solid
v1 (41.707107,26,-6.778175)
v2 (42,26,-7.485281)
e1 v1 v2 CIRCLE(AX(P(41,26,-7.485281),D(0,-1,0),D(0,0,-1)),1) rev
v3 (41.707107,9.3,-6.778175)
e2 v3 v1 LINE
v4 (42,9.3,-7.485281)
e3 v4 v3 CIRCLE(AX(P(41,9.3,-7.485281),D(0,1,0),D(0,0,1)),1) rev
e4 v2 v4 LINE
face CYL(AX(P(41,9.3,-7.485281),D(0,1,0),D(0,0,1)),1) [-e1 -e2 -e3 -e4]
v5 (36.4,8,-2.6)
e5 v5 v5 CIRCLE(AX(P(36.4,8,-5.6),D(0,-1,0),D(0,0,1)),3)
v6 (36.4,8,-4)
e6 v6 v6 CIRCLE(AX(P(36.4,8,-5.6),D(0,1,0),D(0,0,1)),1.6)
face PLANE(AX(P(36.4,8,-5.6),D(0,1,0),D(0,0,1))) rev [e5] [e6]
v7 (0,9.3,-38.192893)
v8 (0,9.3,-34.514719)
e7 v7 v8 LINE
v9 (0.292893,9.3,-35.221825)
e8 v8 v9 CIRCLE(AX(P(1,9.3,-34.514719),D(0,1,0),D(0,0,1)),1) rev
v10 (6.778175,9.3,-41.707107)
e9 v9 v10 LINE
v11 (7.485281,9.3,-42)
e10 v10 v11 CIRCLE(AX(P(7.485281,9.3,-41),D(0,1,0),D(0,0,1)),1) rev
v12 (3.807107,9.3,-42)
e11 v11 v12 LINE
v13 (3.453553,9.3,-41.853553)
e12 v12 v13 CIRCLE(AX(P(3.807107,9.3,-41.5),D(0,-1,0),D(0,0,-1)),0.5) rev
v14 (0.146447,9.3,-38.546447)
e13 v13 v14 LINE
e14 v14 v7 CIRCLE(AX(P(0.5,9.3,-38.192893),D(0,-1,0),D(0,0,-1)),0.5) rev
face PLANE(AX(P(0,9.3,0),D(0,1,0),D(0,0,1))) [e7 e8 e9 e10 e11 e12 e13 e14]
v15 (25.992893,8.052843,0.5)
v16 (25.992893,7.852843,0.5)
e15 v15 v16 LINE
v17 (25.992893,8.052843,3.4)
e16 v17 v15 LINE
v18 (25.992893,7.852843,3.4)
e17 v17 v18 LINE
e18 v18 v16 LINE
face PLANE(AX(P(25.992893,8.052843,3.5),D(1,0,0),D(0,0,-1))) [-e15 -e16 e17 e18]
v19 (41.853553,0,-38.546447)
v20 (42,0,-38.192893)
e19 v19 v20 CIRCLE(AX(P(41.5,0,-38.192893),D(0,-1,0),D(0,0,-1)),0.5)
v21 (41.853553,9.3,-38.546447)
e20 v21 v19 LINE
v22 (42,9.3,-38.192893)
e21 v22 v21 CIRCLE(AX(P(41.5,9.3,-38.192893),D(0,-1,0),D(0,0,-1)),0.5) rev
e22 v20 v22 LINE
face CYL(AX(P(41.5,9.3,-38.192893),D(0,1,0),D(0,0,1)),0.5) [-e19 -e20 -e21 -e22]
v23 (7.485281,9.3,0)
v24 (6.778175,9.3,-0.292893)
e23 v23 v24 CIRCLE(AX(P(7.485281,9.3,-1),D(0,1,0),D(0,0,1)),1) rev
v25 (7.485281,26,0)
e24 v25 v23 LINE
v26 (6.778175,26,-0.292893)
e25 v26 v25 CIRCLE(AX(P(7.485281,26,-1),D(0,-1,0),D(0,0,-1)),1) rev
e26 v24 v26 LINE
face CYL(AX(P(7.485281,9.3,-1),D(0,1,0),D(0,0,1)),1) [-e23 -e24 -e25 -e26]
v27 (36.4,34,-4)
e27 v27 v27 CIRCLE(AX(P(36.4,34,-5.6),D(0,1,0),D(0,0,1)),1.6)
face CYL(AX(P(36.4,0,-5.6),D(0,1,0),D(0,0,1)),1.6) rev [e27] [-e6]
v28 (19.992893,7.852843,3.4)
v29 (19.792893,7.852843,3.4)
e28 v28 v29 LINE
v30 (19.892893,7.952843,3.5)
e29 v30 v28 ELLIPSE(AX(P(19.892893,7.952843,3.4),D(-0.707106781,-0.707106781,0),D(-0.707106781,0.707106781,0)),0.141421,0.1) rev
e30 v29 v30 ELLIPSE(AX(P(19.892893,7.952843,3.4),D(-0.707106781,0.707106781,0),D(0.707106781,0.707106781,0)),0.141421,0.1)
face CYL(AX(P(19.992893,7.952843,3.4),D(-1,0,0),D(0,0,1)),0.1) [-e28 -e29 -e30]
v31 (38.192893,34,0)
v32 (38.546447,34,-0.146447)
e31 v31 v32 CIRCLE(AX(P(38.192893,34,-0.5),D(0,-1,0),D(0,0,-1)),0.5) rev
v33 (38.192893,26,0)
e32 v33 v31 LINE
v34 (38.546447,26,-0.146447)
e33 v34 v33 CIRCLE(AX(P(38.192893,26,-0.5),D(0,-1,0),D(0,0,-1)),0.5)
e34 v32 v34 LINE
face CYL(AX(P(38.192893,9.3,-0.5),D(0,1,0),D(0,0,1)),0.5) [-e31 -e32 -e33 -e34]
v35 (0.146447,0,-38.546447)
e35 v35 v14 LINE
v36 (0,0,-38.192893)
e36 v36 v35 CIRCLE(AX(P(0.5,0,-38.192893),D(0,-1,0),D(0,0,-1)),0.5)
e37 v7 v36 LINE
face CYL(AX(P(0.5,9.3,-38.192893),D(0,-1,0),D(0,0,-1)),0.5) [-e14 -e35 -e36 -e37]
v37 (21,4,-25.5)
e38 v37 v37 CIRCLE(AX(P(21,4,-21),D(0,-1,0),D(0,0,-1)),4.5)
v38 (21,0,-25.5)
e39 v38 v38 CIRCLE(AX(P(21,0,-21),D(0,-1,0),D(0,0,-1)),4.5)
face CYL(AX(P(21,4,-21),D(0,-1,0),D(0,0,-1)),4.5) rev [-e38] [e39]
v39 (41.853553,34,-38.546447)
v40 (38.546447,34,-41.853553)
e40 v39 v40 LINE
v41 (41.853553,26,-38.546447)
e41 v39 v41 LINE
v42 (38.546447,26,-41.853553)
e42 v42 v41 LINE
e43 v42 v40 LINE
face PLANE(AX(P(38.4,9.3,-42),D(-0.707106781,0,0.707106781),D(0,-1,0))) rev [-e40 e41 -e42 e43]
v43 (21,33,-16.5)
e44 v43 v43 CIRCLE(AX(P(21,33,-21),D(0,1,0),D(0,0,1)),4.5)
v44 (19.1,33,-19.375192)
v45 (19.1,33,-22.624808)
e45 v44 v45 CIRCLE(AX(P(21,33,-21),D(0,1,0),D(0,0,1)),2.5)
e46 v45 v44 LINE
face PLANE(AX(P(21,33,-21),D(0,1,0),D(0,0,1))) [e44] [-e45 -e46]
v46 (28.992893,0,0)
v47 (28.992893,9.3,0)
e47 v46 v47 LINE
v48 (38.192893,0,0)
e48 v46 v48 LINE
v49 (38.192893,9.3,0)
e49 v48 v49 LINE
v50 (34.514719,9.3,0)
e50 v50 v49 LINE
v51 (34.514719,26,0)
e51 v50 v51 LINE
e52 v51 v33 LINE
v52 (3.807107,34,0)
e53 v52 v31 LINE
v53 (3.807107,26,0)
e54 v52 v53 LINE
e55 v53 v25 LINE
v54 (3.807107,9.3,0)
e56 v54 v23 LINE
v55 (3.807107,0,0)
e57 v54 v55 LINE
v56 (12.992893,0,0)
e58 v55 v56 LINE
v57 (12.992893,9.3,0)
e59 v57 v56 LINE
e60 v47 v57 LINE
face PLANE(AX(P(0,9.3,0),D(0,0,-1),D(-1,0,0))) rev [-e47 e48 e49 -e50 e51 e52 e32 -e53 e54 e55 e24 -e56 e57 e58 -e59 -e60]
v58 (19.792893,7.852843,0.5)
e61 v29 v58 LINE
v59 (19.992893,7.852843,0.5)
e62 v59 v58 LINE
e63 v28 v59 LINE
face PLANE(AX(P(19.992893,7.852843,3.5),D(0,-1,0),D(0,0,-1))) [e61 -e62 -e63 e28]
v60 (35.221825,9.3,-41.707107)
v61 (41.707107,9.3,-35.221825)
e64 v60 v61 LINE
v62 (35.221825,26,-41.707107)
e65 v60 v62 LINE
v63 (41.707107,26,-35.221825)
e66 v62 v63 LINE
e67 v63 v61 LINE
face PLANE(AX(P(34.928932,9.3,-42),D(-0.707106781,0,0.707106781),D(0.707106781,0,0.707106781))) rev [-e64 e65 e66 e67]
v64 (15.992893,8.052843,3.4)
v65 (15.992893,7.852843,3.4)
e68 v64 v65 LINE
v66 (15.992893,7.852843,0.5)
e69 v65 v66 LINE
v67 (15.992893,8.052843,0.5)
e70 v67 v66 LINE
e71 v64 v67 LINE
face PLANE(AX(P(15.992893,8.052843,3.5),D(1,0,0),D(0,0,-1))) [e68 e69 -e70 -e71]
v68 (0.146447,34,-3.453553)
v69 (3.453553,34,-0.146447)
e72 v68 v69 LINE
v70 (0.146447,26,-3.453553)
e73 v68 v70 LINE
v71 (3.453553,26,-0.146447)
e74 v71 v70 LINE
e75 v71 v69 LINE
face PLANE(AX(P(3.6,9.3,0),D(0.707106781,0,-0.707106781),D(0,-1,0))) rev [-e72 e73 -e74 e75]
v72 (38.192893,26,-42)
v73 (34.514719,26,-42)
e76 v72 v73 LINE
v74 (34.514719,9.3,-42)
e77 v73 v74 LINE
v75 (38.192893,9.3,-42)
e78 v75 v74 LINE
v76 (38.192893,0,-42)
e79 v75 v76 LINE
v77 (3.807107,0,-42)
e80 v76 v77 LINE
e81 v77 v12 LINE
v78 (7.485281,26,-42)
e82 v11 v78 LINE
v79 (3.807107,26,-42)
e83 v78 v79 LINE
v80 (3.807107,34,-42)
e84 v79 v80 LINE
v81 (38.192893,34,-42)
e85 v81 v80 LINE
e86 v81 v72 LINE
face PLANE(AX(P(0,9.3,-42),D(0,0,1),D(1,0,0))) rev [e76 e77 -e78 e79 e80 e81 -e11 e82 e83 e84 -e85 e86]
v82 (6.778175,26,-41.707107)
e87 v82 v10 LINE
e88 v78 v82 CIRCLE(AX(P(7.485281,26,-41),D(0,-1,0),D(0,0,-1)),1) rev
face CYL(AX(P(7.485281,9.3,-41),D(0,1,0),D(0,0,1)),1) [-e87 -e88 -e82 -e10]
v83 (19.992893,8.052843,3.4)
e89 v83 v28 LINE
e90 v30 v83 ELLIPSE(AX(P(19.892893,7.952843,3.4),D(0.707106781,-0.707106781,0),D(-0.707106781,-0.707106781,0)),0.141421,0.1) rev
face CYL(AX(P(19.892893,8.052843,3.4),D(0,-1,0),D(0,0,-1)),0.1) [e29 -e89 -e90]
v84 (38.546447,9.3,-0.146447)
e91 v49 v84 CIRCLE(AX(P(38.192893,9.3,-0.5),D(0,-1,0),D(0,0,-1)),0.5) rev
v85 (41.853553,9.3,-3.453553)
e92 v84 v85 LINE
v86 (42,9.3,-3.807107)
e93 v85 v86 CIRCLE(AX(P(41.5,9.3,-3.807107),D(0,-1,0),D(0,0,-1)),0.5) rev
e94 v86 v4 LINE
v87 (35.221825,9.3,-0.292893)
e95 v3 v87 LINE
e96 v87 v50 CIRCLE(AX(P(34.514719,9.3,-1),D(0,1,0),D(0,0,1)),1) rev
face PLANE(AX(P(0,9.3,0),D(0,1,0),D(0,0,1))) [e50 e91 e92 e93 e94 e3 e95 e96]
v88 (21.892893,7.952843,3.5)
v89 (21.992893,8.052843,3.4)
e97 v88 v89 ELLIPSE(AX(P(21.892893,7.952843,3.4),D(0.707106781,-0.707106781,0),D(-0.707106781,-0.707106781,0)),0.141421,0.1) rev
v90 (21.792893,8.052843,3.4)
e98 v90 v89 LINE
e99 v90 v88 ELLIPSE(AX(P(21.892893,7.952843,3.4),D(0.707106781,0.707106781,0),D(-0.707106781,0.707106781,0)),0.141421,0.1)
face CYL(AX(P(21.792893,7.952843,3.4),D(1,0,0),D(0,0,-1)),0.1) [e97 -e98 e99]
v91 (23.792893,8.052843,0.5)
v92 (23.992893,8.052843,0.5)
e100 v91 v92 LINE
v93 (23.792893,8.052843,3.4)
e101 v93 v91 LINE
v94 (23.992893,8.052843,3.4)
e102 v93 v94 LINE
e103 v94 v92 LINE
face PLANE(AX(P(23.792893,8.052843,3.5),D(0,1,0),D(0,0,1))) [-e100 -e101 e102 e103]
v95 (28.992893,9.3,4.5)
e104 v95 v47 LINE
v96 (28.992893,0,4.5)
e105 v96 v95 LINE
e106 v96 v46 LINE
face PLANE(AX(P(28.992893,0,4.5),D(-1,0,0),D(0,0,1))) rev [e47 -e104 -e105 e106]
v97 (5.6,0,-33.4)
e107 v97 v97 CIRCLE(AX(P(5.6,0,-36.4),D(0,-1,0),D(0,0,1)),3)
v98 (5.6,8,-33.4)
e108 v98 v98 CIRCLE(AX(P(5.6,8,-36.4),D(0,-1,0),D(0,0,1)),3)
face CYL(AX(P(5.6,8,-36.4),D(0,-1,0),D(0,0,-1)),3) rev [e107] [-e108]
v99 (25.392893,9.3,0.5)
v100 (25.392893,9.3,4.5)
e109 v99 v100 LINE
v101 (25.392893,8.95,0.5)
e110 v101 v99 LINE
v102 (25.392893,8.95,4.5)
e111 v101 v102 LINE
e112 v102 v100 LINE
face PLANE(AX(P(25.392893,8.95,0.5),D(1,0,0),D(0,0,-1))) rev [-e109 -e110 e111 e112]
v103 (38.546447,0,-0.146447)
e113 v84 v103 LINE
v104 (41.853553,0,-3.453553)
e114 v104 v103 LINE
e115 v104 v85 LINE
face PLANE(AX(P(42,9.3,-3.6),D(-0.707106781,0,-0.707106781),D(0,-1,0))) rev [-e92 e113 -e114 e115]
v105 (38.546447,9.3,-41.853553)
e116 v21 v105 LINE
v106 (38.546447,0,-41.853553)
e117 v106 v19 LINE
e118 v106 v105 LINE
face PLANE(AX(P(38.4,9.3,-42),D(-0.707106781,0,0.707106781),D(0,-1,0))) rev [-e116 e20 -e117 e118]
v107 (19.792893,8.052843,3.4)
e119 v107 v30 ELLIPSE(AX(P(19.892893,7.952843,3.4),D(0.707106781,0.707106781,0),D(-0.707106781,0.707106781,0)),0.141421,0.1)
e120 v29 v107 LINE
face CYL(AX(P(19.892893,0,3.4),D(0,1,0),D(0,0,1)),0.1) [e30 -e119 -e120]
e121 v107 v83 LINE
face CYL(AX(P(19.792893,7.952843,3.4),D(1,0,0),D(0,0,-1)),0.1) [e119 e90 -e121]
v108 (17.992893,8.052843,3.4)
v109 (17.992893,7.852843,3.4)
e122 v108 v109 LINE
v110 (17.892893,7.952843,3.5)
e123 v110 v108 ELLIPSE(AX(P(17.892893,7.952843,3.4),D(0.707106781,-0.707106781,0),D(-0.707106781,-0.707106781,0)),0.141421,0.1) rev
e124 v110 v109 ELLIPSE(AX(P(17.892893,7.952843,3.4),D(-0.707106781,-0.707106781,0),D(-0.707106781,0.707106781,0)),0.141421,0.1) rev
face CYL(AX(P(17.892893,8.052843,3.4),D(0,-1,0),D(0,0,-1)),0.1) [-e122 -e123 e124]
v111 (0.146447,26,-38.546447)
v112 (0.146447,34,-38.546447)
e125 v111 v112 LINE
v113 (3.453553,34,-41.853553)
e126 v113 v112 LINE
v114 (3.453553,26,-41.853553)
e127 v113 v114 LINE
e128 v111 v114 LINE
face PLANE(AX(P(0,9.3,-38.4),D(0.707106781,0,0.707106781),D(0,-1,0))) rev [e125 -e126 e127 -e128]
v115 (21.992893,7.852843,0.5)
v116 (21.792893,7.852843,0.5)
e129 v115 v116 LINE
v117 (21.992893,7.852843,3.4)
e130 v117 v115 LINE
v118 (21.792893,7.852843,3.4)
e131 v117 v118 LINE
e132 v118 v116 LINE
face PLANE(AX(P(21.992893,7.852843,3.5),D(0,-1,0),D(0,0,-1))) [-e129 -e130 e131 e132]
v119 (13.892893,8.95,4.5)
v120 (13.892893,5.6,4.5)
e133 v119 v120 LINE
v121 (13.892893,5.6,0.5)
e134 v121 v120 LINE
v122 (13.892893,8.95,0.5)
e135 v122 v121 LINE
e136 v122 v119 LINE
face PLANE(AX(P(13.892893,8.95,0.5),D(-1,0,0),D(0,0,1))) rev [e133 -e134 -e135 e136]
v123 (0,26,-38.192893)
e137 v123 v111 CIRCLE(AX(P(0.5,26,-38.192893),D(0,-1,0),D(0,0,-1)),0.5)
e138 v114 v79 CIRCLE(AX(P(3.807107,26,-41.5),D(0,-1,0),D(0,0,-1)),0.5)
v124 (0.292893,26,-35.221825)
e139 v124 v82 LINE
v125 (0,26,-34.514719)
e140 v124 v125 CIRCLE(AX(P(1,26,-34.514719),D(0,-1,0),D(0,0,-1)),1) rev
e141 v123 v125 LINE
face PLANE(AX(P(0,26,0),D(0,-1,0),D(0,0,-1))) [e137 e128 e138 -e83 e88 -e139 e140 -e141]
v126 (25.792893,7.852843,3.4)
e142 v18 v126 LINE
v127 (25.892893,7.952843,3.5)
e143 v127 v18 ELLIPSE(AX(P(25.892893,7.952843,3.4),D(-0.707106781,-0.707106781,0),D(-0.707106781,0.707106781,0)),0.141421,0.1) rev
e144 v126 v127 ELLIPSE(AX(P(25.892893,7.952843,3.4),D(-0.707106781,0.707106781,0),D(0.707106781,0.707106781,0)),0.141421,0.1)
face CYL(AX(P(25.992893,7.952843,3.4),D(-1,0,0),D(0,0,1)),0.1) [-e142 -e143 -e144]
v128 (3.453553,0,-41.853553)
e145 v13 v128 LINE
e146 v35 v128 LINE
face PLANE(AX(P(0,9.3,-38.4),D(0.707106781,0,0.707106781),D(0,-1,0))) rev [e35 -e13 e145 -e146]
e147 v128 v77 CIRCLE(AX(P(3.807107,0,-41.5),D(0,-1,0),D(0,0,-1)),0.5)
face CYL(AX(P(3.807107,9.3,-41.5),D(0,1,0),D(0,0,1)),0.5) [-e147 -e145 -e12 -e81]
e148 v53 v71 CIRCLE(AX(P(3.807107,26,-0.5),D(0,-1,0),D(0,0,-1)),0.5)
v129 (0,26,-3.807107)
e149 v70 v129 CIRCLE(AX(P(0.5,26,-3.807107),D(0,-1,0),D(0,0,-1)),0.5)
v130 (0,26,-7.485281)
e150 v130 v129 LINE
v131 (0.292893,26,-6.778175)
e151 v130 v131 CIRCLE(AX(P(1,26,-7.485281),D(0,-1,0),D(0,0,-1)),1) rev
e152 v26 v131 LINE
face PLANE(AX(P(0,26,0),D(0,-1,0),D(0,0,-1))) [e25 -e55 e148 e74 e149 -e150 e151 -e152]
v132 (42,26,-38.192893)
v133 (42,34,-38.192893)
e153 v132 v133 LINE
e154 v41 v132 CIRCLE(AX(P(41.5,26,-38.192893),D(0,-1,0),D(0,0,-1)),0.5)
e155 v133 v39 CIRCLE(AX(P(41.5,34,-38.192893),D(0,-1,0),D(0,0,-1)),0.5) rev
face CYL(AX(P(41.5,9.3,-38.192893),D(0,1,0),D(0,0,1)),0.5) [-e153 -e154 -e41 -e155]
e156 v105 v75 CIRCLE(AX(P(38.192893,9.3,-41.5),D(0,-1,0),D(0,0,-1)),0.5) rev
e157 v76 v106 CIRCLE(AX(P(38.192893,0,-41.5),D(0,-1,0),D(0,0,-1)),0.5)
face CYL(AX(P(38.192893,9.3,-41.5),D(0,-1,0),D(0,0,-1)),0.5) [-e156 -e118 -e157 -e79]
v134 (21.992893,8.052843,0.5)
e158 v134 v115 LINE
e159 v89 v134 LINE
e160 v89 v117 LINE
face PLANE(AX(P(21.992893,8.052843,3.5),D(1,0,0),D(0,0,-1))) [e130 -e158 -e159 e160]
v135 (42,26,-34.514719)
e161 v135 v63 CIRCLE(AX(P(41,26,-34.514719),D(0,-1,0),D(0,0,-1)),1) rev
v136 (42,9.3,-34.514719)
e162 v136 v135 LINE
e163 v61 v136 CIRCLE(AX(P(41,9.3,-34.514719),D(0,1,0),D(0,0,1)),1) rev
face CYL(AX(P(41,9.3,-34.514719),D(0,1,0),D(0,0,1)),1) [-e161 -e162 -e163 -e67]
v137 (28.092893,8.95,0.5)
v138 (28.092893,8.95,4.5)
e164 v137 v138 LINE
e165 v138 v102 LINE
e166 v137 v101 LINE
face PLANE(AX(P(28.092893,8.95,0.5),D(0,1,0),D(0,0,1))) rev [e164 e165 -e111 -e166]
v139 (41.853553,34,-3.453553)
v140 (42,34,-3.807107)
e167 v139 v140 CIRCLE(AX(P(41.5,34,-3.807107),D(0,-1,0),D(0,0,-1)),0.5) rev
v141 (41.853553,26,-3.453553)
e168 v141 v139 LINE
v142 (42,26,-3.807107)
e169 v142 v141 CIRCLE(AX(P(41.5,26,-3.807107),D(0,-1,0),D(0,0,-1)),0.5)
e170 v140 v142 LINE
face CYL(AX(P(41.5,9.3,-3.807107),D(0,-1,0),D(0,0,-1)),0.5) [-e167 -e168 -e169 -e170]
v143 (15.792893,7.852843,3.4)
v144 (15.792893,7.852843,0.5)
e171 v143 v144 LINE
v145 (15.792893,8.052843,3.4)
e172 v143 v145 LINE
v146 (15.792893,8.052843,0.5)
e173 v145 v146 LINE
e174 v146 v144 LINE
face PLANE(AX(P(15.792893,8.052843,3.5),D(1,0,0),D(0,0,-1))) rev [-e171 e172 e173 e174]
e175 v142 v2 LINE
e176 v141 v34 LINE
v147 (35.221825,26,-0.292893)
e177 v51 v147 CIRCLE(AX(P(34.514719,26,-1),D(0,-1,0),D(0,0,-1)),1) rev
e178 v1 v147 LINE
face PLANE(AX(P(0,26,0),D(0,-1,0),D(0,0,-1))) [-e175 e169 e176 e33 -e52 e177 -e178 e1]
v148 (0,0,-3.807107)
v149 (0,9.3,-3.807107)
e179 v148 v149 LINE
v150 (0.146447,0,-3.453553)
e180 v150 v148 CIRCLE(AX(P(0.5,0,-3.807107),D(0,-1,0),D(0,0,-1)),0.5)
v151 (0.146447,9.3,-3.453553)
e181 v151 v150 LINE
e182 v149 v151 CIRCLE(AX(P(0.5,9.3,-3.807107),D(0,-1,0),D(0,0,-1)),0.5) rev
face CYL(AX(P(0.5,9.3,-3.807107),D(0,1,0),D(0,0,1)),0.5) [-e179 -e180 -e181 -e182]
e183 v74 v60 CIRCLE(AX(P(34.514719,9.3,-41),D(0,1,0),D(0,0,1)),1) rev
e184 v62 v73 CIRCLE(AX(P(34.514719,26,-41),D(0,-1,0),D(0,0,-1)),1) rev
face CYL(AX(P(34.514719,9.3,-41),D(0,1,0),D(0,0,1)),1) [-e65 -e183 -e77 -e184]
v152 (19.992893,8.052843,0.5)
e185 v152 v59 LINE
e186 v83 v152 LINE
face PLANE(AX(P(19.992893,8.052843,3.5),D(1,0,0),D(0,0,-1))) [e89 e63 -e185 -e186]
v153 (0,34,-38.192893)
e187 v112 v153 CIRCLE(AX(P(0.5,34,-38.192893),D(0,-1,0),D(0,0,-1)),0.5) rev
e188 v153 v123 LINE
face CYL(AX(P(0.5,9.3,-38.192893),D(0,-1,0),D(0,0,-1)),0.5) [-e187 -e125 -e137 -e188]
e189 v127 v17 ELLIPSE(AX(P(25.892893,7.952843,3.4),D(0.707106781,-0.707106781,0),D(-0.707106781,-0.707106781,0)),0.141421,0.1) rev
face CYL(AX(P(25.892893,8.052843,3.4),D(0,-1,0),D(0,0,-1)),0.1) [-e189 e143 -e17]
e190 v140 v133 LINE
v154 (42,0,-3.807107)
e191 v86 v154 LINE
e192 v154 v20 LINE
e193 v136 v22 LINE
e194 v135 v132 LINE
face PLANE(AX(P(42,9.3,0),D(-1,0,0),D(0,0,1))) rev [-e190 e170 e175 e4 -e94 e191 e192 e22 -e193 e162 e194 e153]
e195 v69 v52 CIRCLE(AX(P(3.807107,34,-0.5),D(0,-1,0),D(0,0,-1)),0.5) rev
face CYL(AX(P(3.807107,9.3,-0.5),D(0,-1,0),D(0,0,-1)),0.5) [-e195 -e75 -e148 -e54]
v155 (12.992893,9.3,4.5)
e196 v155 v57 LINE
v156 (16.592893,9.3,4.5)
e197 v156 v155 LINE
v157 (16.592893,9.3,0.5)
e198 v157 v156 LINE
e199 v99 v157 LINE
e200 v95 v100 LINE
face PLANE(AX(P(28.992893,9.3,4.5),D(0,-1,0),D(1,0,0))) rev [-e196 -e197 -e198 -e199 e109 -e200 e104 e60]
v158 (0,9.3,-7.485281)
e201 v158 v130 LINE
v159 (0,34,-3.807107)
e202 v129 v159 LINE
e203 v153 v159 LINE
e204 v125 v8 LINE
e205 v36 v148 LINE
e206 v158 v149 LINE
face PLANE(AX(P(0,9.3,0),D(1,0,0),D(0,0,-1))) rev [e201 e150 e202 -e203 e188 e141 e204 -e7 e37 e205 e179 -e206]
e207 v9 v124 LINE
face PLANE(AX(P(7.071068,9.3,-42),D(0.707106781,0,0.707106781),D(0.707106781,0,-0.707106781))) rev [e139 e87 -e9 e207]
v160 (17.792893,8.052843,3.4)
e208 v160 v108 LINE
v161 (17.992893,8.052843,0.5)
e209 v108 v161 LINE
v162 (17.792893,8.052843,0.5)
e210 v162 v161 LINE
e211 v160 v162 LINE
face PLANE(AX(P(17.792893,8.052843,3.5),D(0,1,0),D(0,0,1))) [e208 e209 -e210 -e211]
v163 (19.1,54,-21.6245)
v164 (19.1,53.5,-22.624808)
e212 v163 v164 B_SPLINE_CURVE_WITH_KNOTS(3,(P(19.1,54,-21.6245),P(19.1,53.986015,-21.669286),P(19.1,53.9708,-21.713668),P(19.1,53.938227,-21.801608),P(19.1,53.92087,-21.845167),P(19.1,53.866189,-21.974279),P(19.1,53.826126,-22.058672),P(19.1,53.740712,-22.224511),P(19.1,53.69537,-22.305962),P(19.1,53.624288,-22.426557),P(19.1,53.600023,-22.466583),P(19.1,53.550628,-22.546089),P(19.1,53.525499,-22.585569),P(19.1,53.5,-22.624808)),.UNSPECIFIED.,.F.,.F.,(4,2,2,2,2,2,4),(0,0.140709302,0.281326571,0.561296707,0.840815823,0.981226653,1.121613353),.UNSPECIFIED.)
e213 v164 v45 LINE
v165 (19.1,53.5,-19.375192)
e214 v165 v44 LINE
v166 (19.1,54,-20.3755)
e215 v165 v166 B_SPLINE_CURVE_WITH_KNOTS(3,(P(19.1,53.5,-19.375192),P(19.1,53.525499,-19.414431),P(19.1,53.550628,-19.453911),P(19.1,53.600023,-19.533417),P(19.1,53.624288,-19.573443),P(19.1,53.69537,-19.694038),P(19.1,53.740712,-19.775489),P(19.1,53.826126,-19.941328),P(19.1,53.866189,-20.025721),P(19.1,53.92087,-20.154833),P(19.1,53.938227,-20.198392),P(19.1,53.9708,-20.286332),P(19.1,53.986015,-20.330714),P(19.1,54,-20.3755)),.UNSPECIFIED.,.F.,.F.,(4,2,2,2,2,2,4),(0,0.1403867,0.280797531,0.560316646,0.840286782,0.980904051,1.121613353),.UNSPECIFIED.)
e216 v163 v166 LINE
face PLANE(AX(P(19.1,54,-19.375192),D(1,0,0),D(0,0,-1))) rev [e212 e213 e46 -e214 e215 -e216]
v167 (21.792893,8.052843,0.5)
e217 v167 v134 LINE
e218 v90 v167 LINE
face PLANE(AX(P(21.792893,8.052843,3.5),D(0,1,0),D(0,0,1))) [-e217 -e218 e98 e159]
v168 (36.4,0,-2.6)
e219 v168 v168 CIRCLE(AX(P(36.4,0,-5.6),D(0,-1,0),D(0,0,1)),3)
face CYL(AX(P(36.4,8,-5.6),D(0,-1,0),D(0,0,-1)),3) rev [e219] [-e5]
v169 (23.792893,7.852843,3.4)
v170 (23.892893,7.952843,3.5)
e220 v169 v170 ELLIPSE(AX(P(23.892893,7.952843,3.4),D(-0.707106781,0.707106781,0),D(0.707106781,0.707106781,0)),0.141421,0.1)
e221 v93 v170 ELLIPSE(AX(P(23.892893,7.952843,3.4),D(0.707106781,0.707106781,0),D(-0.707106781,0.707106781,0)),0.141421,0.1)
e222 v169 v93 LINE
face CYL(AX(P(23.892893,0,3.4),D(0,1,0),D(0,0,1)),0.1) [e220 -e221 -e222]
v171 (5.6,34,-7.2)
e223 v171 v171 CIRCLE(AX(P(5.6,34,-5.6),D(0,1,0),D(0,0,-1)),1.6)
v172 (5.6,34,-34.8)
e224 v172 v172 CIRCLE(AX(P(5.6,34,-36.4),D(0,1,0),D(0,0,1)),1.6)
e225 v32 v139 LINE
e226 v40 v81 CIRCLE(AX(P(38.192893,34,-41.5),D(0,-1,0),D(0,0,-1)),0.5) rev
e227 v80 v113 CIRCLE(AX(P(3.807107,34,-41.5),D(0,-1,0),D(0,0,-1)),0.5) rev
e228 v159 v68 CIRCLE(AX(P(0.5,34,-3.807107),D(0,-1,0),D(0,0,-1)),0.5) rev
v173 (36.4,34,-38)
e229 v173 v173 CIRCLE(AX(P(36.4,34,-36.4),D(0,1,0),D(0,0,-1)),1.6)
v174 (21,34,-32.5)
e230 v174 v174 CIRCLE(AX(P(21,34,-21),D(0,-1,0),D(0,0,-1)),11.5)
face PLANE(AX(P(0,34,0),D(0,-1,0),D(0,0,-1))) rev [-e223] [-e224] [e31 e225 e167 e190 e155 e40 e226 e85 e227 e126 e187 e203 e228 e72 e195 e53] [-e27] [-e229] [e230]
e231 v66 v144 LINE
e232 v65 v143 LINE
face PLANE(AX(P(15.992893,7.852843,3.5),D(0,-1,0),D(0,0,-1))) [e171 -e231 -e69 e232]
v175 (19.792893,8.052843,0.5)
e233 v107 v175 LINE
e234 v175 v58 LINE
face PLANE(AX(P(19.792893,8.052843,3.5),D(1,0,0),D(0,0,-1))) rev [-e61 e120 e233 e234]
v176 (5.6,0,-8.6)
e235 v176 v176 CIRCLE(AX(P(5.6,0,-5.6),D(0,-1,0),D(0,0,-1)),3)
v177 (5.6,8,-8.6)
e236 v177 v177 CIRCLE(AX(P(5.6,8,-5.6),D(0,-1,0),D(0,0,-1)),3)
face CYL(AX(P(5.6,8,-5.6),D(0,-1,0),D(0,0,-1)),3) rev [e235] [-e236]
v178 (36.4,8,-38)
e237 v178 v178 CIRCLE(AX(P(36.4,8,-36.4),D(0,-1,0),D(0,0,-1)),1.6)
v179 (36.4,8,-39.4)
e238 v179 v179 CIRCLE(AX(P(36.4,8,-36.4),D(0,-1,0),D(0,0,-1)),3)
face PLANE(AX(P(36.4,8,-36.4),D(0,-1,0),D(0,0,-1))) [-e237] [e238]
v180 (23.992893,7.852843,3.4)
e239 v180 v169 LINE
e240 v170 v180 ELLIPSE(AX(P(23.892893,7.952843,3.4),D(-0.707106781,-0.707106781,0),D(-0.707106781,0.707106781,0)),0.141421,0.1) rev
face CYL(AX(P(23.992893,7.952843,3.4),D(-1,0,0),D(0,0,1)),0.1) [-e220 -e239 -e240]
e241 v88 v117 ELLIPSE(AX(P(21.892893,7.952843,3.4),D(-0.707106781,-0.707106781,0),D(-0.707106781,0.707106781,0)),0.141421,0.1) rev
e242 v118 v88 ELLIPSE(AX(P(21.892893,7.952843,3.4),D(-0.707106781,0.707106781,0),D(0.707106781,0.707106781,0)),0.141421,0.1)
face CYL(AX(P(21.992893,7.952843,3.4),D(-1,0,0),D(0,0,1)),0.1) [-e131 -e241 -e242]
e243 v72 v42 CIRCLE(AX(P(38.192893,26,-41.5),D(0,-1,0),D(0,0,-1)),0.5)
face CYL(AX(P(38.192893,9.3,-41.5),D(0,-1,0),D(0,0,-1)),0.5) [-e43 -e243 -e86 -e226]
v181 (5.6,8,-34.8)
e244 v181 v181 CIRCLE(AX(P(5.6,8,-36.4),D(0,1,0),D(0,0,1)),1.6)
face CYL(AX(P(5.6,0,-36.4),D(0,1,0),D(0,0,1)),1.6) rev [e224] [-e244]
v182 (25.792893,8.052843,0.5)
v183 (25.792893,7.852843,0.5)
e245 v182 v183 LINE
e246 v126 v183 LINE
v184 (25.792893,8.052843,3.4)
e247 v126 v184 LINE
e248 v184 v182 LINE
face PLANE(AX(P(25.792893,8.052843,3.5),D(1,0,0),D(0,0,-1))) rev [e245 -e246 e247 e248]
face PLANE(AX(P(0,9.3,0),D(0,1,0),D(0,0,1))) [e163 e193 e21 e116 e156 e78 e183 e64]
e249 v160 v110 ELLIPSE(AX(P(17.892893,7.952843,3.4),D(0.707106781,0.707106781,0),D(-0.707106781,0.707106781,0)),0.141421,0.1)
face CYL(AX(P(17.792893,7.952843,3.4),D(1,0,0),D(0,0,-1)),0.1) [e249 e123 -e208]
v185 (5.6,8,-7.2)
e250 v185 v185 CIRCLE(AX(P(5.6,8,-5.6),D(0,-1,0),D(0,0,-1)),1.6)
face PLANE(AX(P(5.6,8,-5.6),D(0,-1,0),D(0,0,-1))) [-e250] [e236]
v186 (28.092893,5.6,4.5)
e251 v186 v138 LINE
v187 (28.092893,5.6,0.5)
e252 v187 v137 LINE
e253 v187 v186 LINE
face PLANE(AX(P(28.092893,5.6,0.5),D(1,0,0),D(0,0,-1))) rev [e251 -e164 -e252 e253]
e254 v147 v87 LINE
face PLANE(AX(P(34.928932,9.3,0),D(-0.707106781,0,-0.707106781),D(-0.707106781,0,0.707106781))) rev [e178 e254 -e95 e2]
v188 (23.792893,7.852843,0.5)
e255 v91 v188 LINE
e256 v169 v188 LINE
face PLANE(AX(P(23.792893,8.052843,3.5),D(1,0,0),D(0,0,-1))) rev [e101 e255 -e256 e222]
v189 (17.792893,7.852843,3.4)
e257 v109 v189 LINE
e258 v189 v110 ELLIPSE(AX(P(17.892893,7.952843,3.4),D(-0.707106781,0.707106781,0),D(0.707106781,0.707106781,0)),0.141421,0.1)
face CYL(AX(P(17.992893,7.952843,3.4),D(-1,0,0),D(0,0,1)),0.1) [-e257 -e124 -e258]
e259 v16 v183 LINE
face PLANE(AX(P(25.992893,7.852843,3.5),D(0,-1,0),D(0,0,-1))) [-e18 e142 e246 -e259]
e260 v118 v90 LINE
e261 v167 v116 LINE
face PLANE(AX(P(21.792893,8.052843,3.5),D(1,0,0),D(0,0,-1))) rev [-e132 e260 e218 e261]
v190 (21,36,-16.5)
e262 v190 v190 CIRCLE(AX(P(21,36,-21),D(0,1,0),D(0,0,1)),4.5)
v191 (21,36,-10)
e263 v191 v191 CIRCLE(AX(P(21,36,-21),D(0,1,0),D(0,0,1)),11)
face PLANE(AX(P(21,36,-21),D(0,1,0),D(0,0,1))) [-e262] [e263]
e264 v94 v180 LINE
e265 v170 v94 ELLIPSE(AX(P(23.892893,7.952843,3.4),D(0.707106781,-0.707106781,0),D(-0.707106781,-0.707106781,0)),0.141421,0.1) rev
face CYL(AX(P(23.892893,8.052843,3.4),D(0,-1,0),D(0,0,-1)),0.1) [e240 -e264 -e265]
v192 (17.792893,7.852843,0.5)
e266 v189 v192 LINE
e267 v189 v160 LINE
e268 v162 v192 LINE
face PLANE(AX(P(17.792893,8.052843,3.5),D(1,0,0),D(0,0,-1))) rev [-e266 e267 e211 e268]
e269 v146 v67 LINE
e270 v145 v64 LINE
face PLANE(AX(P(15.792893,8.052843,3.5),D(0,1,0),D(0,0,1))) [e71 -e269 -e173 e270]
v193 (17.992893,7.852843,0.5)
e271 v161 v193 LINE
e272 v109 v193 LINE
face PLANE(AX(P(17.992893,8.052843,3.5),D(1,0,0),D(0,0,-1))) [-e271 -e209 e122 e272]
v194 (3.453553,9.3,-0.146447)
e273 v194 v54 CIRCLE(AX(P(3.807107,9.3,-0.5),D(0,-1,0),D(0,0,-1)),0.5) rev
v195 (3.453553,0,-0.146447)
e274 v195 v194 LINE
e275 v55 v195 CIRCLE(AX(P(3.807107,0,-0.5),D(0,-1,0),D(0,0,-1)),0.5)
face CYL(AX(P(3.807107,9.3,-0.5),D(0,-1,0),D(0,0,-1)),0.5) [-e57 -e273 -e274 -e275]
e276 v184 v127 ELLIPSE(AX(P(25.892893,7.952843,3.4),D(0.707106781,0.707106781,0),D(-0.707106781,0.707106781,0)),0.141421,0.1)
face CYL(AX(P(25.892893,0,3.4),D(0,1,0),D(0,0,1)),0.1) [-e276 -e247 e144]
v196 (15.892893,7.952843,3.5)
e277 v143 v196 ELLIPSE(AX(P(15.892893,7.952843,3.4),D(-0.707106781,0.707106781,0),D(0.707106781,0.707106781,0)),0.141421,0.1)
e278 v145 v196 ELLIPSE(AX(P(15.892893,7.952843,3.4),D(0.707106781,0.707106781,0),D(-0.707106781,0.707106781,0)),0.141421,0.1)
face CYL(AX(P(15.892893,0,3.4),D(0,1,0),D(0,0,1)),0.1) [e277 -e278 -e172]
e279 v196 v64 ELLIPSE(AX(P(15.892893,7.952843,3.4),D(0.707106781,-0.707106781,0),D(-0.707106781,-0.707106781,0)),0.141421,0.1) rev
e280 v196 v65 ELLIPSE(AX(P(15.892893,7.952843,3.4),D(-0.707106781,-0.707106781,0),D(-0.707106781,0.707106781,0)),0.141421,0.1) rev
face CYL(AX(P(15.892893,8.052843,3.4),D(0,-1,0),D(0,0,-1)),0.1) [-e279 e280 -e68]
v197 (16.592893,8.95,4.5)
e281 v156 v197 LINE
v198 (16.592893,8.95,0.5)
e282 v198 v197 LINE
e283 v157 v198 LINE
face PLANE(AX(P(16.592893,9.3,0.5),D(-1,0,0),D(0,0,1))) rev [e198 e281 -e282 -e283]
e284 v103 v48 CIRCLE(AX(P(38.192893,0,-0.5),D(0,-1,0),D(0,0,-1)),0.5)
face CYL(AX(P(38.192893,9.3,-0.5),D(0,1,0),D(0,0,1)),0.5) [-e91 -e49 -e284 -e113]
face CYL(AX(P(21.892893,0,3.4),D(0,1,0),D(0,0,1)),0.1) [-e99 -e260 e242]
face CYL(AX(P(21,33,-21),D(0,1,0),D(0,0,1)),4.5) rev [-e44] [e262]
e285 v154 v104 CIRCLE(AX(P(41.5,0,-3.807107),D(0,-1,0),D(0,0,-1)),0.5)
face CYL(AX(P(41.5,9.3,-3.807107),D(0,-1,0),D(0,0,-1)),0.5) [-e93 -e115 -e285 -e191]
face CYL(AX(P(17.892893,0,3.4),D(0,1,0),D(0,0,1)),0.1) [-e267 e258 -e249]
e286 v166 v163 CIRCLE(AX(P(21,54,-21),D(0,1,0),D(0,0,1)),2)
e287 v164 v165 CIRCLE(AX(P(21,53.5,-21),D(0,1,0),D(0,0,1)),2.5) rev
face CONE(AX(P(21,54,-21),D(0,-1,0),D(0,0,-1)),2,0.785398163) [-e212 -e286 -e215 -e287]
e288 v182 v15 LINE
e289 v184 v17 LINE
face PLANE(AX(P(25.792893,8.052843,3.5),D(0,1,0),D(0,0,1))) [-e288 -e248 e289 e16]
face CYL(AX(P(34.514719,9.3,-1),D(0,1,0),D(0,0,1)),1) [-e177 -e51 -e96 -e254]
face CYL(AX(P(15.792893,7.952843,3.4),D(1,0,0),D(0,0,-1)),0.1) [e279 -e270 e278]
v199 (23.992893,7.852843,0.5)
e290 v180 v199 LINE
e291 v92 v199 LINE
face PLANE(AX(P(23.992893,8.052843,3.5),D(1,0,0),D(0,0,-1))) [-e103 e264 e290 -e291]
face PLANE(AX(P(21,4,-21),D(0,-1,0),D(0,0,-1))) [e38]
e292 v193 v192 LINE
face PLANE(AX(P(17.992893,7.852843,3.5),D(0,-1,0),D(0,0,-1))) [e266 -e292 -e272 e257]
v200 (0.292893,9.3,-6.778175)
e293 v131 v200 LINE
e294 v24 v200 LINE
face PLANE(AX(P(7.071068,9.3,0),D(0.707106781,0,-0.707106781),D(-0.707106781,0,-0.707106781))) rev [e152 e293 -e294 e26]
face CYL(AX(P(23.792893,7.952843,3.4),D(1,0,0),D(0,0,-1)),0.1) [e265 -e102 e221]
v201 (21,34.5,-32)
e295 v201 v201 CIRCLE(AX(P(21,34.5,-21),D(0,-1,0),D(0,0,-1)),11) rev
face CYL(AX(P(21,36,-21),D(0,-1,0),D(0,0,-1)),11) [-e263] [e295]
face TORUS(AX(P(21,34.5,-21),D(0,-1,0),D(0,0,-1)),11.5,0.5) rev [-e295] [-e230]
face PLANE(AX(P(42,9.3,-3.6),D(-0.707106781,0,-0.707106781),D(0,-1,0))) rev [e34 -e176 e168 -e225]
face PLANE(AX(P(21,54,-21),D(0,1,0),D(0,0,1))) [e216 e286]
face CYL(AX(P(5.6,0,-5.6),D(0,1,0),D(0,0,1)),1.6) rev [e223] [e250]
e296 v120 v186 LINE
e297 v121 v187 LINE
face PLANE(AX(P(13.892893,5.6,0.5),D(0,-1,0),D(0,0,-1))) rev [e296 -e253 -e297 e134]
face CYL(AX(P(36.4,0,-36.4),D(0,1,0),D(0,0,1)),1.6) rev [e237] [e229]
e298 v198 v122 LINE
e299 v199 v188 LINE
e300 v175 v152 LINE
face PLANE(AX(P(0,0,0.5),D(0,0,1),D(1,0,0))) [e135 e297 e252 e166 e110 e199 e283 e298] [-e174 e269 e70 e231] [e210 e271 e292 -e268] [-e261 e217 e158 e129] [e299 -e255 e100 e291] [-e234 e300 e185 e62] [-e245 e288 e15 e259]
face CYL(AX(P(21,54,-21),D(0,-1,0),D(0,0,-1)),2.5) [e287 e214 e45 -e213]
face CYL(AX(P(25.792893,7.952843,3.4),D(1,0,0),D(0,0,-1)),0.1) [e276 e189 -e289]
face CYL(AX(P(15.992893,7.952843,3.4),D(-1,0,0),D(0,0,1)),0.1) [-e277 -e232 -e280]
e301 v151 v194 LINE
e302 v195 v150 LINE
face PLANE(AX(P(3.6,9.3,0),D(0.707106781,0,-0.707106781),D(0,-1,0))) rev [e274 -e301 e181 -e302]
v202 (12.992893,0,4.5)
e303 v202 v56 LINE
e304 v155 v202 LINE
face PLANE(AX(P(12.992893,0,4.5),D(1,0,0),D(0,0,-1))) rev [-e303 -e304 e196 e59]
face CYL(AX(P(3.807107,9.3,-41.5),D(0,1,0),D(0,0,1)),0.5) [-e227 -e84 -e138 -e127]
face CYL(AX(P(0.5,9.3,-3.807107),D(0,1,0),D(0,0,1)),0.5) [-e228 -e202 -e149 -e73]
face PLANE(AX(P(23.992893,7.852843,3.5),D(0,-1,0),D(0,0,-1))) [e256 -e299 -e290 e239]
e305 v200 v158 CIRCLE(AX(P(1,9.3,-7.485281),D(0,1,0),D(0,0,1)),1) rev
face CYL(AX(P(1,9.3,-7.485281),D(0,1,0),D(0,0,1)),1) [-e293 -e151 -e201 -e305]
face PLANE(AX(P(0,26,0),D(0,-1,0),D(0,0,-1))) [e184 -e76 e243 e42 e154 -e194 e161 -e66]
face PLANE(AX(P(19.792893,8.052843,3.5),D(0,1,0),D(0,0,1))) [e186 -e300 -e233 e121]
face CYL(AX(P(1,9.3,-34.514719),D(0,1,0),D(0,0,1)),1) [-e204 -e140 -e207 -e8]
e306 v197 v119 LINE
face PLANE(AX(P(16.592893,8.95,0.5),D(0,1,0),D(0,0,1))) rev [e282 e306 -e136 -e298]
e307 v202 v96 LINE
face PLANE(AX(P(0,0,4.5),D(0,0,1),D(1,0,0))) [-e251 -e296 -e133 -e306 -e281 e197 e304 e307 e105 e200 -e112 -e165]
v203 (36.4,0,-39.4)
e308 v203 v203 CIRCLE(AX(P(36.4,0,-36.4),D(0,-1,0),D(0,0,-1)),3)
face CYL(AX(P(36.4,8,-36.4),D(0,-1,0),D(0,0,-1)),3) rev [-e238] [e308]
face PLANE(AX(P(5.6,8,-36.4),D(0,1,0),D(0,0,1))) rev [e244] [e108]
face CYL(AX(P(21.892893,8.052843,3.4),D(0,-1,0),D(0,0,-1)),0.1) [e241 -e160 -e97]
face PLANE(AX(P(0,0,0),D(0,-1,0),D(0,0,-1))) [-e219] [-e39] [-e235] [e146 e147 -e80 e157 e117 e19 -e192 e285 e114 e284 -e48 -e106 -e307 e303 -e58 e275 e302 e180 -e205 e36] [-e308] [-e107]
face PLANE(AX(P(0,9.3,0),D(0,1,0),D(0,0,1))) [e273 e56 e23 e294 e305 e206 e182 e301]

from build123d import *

# Parameters (mm, degrees)
SZKIC1_W                          = 42
SZKIC1_H                          = 42
DODANIE_WYCI_GNI_CIE1_DEPTH       = 9.3
SFAZOWANIE1_SIZE                  = 3.6
ZAOKR_GLENIE1_R                   = 0.5
SZKIC2_W                          = 42
SZKIC2_H                          = 42
DODANIE_WYCI_GNI_CIE2_DEPTH       = 16.7
WYTNIJ_WYCI_GNI_CIE1_DEPTH        = 16.7
ZAOKR_GLENIE2_R                   = 1
SZKIC3_W                          = 42
SZKIC3_H                          = 42
DODANIE_WYCI_GNI_CIE3_DEPTH       = 8
SFAZOWANIE3_SIZE                  = 3.6
ZAOKR_GLENIE3_R                   = 0.5
SZKIC5_R                          = 4.5
WYTNIJ_WYCI_GNI_CIE2_DEPTH        = 4
SZKIC6_R                          = 3
WYTNIJ_WYCI_GNI_CIE3_DEPTH        = 8
SZKIC7_R                          = 1.6
WYTNIJ_WYCI_GNI_CIE4_DEPTH        = 69.439754529
SZKIC20_R                         = 11
DODANIE_WYCI_GNI_CIE4_DEPTH       = 2
ZAOKR_GLENIE4_R                   = 0.5
WYTNIJ_WYCI_GNI_CIE6_START        = -3
SZKIC21_R                         = 4.5
WYTNIJ_WYCI_GNI_CIE6_DEPTH        = 3
DODANIE_WYCI_GNI_CIE5_DEPTH       = 21
SFAZOWANIE4_SIZE                  = 0.5
SZKIC23_W                         = 16
SZKIC23_H                         = 9.3
DODANIE_WYCI_GNI_CIE6_DEPTH       = 4.5
WYTNIJ_WYCI_GNI_CIE7_DEPTH        = 4
SZKIC25_W                         = 0.2
SZKIC25_H                         = 0.2
WYCI_GNI_CIE_CIENKA_CIANKA2_DEPTH = 3
ZAOKR_GLENIE6_R                   = 0.1


with BuildPart() as part:
    # Szkic1 → Dodanie-wyciągnięcie1 (new body)
    with BuildSketch(Plane(origin=(0, 0, 0), x_dir=(1, 0, 0), z_dir=(0, 1, 0))):
        with Locations((21, 21)):
            Rectangle(SZKIC1_W, SZKIC1_H)
    extrude(amount=DODANIE_WYCI_GNI_CIE1_DEPTH)

    # Sfazowanie1
    sfazowanie1_edges = [part.edges().sort_by_distance(p)[0] for p in [
        (0, 4.65, -42),
        (42, 4.65, -42),
        (42, 4.65, 0),
        (0, 4.65, 0),
    ]]
    chamfer(sfazowanie1_edges, length=SFAZOWANIE1_SIZE)

    # Zaokrąglenie1
    zaokr_glenie1_edges = [part.edges().sort_by_distance(p)[0] for p in [
        (0, 4.65, -3.6),
        (0, 4.65, -38.4),
        (38.4, 4.65, -42),
        (3.6, 4.65, -42),
        (38.4, 4.65, 0),
        (3.6, 4.65, 0),
        (42, 4.65, -3.6),
        (42, 4.65, -38.4),
    ]]
    fillet(zaokr_glenie1_edges, radius=ZAOKR_GLENIE1_R)

    # Szkic2 → Dodanie-wyciągnięcie2 (add)
    with BuildSketch(Plane(origin=(0, 9.3, 0), x_dir=(1, 0, 0), z_dir=(0, 1, 0))):
        with Locations((21, 21)):
            Rectangle(SZKIC2_W, SZKIC2_H)
    extrude(amount=DODANIE_WYCI_GNI_CIE2_DEPTH)

    # Szkic4 → Wytnij-wyciągnięcie1 (cut)
    with BuildSketch(Plane(origin=(0, 26, 0), x_dir=(1, 0, 0), z_dir=(0, 1, 0))):
        Polygon((34.928932188, 0), (42, 7.071067812), (42, 0), align=None)
        Polygon((42, 34.928932188), (42, 42), (34.928932188, 42), align=None)
        Polygon((7.071067812, 42), (0, 34.928932188), (0, 42), align=None)
        Polygon((0, 7.071067812), (0, 0), (7.071067812, 0), align=None)
    extrude(amount=-WYTNIJ_WYCI_GNI_CIE1_DEPTH, mode=Mode.SUBTRACT)

    # Zaokrąglenie2
    zaokr_glenie2_edges = [part.edges().sort_by_distance(p)[0] for p in [
        (0, 17.65, -7.071067812),
        (7.071067812, 17.65, 0),
        (7.071067812, 17.65, -42),
        (0, 17.65, -34.928932188),
        (42, 17.65, -34.928932188),
        (34.928932188, 17.65, -42),
        (34.928932188, 17.65, 0),
        (42, 17.65, -7.071067812),
    ]]
    fillet(zaokr_glenie2_edges, radius=ZAOKR_GLENIE2_R)

    # Szkic3 → Dodanie-wyciągnięcie3 (add)
    with BuildSketch(Plane(origin=(0, 26, 0), x_dir=(1, 0, 0), z_dir=(0, 1, 0))):
        with Locations((21, 21)):
            Rectangle(SZKIC3_W, SZKIC3_H)
    extrude(amount=DODANIE_WYCI_GNI_CIE3_DEPTH)

    # Sfazowanie3
    sfazowanie3_edges = [part.edges().sort_by_distance(p)[0] for p in [
        (0, 30, -42),
        (0, 30, 0),
        (42, 30, 0),
        (42, 30, -42),
    ]]
    chamfer(sfazowanie3_edges, length=SFAZOWANIE3_SIZE)

    # Zaokrąglenie3
    zaokr_glenie3_edges = [part.edges().sort_by_distance(p)[0] for p in [
        (38.4, 30, 0),
        (3.6, 30, 0),
        (0, 30, -38.4),
        (0, 30, -3.6),
        (38.4, 30, -42),
        (3.6, 30, -42),
        (42, 30, -38.4),
        (42, 30, -3.6),
    ]]
    fillet(zaokr_glenie3_edges, radius=ZAOKR_GLENIE3_R)

    # Szkic5 → Wytnij-wyciągnięcie2 (cut)
    with BuildSketch(Plane.XZ):
        with Locations(Location((21, -21, 0), (0, 0, 270))):
            Circle(SZKIC5_R)
    extrude(amount=-WYTNIJ_WYCI_GNI_CIE2_DEPTH, mode=Mode.SUBTRACT)

    # Szkic6 → Wytnij-wyciągnięcie3 (cut)
    with BuildSketch(Plane.XZ):
        with Locations(Location((5.6, -5.6, 0), (0, 0, 270))):
            Circle(SZKIC6_R)
        with Locations(Location((36.4, -5.6, 0), (0, 0, 90))):
            Circle(SZKIC6_R)
        with Locations(Location((36.4, -36.4, 0), (0, 0, 270))):
            Circle(SZKIC6_R)
        with Locations(Location((5.6, -36.4, 0), (0, 0, 90))):
            Circle(SZKIC6_R)
    extrude(amount=-WYTNIJ_WYCI_GNI_CIE3_DEPTH, mode=Mode.SUBTRACT)

    # Szkic7 → Wytnij-wyciągnięcie4 (cut, through all)
    with BuildSketch(Plane(origin=(0, 34, 0), x_dir=(1, 0, 0), z_dir=(0, 1, 0))):
        with Locations(Location((36.4, 5.6, 0), (0, 0, 270))):
            Circle(SZKIC7_R)
        with Locations(Location((5.6, 5.6, 0), (0, 0, 90))):
            Circle(SZKIC7_R)
        with Locations(Location((5.6, 36.4, 0), (0, 0, 270))):
            Circle(SZKIC7_R)
        with Locations(Location((36.4, 36.4, 0), (0, 0, 90))):
            Circle(SZKIC7_R)
    extrude(amount=-WYTNIJ_WYCI_GNI_CIE4_DEPTH, mode=Mode.SUBTRACT)

    # Szkic20 → Dodanie-wyciągnięcie4 (add)
    with BuildSketch(Plane(origin=(0, 34, 0), x_dir=(1, 0, 0), z_dir=(0, 1, 0))):
        with Locations(Location((21, 21, 0), (0, 0, 90))):
            Circle(SZKIC20_R)
    extrude(amount=DODANIE_WYCI_GNI_CIE4_DEPTH)

    # Zaokrąglenie4
    zaokr_glenie4_edges = [part.edges().sort_by_distance(p)[0] for p in [
        (21, 34, -10),
    ]]
    fillet(zaokr_glenie4_edges, radius=ZAOKR_GLENIE4_R)

    # Szkic21 → Wytnij-wyciągnięcie6 (cut)
    with BuildSketch(Plane(origin=(0, 36, 0), x_dir=(1, 0, 0), z_dir=(0, 1, 0)).offset(WYTNIJ_WYCI_GNI_CIE6_START)):
        with Locations(Location((21, 21, 0), (0, 0, 90))):
            Circle(SZKIC21_R)
    extrude(amount=WYTNIJ_WYCI_GNI_CIE6_DEPTH, mode=Mode.SUBTRACT)

    # Szkic22 → Dodanie-wyciągnięcie5 (add)
    with BuildSketch(Plane(origin=(0, 33, 0), x_dir=(1, 0, 0), z_dir=(0, 1, 0))):
        with BuildLine():
            Line((19.1, 19.375192319), (19.1, 22.624807681))
            ThreePointArc((19.1, 22.624807681), (23.5, 21), (19.1, 19.375192319))
        make_face()
    extrude(amount=DODANIE_WYCI_GNI_CIE5_DEPTH)

    # Sfazowanie4
    sfazowanie4_edges = [part.edges().sort_by_distance(p)[0] for p in [
        (23.5, 54, -21),
    ]]
    chamfer(sfazowanie4_edges, length=SFAZOWANIE4_SIZE)

    # Szkic23 → Dodanie-wyciągnięcie6 (add)
    with BuildSketch(Plane.XY):
        with Locations((20.992893219, 4.65)):
            Rectangle(SZKIC23_W, SZKIC23_H)
    extrude(amount=DODANIE_WYCI_GNI_CIE6_DEPTH)

    # Szkic24 → Wytnij-wyciągnięcie7 (cut)
    with BuildSketch(Plane.XY.offset(4.5)):
        Polygon((16.592893219, 9.3), (16.592893219, 8.95), (13.892893219, 8.95), (13.892893219, 5.6), (28.092893219, 5.6), (28.092893219, 8.95), (25.392893219, 8.95), (25.392893219, 9.3), align=None)
    extrude(amount=-WYTNIJ_WYCI_GNI_CIE7_DEPTH, mode=Mode.SUBTRACT)

    # Szkic25 → Wyciągnięcie-cienka ścianka2 (add)
    with BuildSketch(Plane.XY.offset(0.5)):
        with Locations((15.892893219, 7.95284256)):
            Rectangle(SZKIC25_W, SZKIC25_H)
        with Locations((17.892893219, 7.95284256)):
            Rectangle(SZKIC25_W, SZKIC25_H)
        with Locations((19.892893219, 7.95284256)):
            Rectangle(SZKIC25_W, SZKIC25_H)
        with Locations((21.892893219, 7.95284256)):
            Rectangle(SZKIC25_W, SZKIC25_H)
        with Locations((23.892893219, 7.95284256)):
            Rectangle(SZKIC25_W, SZKIC25_H)
        with Locations((25.892893219, 7.95284256)):
            Rectangle(SZKIC25_W, SZKIC25_H)
    extrude(amount=WYCI_GNI_CIE_CIENKA_CIANKA2_DEPTH)

    # Zaokrąglenie6
    zaokr_glenie6_edges = [part.edges().sort_by_distance(p)[0] for p in [
        (19.892893219, 7.85284256, 3.5),
        (19.992893219, 7.95284256, 3.5),
        (19.892893219, 8.05284256, 3.5),
        (19.792893219, 7.95284256, 3.5),
        (15.892893219, 7.85284256, 3.5),
        (15.992893219, 7.95284256, 3.5),
        (15.892893219, 8.05284256, 3.5),
        (15.792893219, 7.95284256, 3.5),
        (17.892893219, 7.85284256, 3.5),
        (17.992893219, 7.95284256, 3.5),
        (17.892893219, 8.05284256, 3.5),
        (17.792893219, 7.95284256, 3.5),
        (21.892893219, 7.85284256, 3.5),
        (21.992893219, 7.95284256, 3.5),
        (21.892893219, 8.05284256, 3.5),
        (21.792893219, 7.95284256, 3.5),
        (23.892893219, 7.85284256, 3.5),
        (23.992893219, 7.95284256, 3.5),
        (23.892893219, 8.05284256, 3.5),
        (23.792893219, 7.95284256, 3.5),
        (25.892893219, 7.85284256, 3.5),
        (25.992893219, 7.95284256, 3.5),
        (25.892893219, 8.05284256, 3.5),
        (25.792893219, 7.95284256, 3.5),
    ]]
    fillet(zaokr_glenie6_edges, radius=ZAOKR_GLENIE6_R - 0.0001)  # a hair under: the kernel refuses the full size


solid = part.part
